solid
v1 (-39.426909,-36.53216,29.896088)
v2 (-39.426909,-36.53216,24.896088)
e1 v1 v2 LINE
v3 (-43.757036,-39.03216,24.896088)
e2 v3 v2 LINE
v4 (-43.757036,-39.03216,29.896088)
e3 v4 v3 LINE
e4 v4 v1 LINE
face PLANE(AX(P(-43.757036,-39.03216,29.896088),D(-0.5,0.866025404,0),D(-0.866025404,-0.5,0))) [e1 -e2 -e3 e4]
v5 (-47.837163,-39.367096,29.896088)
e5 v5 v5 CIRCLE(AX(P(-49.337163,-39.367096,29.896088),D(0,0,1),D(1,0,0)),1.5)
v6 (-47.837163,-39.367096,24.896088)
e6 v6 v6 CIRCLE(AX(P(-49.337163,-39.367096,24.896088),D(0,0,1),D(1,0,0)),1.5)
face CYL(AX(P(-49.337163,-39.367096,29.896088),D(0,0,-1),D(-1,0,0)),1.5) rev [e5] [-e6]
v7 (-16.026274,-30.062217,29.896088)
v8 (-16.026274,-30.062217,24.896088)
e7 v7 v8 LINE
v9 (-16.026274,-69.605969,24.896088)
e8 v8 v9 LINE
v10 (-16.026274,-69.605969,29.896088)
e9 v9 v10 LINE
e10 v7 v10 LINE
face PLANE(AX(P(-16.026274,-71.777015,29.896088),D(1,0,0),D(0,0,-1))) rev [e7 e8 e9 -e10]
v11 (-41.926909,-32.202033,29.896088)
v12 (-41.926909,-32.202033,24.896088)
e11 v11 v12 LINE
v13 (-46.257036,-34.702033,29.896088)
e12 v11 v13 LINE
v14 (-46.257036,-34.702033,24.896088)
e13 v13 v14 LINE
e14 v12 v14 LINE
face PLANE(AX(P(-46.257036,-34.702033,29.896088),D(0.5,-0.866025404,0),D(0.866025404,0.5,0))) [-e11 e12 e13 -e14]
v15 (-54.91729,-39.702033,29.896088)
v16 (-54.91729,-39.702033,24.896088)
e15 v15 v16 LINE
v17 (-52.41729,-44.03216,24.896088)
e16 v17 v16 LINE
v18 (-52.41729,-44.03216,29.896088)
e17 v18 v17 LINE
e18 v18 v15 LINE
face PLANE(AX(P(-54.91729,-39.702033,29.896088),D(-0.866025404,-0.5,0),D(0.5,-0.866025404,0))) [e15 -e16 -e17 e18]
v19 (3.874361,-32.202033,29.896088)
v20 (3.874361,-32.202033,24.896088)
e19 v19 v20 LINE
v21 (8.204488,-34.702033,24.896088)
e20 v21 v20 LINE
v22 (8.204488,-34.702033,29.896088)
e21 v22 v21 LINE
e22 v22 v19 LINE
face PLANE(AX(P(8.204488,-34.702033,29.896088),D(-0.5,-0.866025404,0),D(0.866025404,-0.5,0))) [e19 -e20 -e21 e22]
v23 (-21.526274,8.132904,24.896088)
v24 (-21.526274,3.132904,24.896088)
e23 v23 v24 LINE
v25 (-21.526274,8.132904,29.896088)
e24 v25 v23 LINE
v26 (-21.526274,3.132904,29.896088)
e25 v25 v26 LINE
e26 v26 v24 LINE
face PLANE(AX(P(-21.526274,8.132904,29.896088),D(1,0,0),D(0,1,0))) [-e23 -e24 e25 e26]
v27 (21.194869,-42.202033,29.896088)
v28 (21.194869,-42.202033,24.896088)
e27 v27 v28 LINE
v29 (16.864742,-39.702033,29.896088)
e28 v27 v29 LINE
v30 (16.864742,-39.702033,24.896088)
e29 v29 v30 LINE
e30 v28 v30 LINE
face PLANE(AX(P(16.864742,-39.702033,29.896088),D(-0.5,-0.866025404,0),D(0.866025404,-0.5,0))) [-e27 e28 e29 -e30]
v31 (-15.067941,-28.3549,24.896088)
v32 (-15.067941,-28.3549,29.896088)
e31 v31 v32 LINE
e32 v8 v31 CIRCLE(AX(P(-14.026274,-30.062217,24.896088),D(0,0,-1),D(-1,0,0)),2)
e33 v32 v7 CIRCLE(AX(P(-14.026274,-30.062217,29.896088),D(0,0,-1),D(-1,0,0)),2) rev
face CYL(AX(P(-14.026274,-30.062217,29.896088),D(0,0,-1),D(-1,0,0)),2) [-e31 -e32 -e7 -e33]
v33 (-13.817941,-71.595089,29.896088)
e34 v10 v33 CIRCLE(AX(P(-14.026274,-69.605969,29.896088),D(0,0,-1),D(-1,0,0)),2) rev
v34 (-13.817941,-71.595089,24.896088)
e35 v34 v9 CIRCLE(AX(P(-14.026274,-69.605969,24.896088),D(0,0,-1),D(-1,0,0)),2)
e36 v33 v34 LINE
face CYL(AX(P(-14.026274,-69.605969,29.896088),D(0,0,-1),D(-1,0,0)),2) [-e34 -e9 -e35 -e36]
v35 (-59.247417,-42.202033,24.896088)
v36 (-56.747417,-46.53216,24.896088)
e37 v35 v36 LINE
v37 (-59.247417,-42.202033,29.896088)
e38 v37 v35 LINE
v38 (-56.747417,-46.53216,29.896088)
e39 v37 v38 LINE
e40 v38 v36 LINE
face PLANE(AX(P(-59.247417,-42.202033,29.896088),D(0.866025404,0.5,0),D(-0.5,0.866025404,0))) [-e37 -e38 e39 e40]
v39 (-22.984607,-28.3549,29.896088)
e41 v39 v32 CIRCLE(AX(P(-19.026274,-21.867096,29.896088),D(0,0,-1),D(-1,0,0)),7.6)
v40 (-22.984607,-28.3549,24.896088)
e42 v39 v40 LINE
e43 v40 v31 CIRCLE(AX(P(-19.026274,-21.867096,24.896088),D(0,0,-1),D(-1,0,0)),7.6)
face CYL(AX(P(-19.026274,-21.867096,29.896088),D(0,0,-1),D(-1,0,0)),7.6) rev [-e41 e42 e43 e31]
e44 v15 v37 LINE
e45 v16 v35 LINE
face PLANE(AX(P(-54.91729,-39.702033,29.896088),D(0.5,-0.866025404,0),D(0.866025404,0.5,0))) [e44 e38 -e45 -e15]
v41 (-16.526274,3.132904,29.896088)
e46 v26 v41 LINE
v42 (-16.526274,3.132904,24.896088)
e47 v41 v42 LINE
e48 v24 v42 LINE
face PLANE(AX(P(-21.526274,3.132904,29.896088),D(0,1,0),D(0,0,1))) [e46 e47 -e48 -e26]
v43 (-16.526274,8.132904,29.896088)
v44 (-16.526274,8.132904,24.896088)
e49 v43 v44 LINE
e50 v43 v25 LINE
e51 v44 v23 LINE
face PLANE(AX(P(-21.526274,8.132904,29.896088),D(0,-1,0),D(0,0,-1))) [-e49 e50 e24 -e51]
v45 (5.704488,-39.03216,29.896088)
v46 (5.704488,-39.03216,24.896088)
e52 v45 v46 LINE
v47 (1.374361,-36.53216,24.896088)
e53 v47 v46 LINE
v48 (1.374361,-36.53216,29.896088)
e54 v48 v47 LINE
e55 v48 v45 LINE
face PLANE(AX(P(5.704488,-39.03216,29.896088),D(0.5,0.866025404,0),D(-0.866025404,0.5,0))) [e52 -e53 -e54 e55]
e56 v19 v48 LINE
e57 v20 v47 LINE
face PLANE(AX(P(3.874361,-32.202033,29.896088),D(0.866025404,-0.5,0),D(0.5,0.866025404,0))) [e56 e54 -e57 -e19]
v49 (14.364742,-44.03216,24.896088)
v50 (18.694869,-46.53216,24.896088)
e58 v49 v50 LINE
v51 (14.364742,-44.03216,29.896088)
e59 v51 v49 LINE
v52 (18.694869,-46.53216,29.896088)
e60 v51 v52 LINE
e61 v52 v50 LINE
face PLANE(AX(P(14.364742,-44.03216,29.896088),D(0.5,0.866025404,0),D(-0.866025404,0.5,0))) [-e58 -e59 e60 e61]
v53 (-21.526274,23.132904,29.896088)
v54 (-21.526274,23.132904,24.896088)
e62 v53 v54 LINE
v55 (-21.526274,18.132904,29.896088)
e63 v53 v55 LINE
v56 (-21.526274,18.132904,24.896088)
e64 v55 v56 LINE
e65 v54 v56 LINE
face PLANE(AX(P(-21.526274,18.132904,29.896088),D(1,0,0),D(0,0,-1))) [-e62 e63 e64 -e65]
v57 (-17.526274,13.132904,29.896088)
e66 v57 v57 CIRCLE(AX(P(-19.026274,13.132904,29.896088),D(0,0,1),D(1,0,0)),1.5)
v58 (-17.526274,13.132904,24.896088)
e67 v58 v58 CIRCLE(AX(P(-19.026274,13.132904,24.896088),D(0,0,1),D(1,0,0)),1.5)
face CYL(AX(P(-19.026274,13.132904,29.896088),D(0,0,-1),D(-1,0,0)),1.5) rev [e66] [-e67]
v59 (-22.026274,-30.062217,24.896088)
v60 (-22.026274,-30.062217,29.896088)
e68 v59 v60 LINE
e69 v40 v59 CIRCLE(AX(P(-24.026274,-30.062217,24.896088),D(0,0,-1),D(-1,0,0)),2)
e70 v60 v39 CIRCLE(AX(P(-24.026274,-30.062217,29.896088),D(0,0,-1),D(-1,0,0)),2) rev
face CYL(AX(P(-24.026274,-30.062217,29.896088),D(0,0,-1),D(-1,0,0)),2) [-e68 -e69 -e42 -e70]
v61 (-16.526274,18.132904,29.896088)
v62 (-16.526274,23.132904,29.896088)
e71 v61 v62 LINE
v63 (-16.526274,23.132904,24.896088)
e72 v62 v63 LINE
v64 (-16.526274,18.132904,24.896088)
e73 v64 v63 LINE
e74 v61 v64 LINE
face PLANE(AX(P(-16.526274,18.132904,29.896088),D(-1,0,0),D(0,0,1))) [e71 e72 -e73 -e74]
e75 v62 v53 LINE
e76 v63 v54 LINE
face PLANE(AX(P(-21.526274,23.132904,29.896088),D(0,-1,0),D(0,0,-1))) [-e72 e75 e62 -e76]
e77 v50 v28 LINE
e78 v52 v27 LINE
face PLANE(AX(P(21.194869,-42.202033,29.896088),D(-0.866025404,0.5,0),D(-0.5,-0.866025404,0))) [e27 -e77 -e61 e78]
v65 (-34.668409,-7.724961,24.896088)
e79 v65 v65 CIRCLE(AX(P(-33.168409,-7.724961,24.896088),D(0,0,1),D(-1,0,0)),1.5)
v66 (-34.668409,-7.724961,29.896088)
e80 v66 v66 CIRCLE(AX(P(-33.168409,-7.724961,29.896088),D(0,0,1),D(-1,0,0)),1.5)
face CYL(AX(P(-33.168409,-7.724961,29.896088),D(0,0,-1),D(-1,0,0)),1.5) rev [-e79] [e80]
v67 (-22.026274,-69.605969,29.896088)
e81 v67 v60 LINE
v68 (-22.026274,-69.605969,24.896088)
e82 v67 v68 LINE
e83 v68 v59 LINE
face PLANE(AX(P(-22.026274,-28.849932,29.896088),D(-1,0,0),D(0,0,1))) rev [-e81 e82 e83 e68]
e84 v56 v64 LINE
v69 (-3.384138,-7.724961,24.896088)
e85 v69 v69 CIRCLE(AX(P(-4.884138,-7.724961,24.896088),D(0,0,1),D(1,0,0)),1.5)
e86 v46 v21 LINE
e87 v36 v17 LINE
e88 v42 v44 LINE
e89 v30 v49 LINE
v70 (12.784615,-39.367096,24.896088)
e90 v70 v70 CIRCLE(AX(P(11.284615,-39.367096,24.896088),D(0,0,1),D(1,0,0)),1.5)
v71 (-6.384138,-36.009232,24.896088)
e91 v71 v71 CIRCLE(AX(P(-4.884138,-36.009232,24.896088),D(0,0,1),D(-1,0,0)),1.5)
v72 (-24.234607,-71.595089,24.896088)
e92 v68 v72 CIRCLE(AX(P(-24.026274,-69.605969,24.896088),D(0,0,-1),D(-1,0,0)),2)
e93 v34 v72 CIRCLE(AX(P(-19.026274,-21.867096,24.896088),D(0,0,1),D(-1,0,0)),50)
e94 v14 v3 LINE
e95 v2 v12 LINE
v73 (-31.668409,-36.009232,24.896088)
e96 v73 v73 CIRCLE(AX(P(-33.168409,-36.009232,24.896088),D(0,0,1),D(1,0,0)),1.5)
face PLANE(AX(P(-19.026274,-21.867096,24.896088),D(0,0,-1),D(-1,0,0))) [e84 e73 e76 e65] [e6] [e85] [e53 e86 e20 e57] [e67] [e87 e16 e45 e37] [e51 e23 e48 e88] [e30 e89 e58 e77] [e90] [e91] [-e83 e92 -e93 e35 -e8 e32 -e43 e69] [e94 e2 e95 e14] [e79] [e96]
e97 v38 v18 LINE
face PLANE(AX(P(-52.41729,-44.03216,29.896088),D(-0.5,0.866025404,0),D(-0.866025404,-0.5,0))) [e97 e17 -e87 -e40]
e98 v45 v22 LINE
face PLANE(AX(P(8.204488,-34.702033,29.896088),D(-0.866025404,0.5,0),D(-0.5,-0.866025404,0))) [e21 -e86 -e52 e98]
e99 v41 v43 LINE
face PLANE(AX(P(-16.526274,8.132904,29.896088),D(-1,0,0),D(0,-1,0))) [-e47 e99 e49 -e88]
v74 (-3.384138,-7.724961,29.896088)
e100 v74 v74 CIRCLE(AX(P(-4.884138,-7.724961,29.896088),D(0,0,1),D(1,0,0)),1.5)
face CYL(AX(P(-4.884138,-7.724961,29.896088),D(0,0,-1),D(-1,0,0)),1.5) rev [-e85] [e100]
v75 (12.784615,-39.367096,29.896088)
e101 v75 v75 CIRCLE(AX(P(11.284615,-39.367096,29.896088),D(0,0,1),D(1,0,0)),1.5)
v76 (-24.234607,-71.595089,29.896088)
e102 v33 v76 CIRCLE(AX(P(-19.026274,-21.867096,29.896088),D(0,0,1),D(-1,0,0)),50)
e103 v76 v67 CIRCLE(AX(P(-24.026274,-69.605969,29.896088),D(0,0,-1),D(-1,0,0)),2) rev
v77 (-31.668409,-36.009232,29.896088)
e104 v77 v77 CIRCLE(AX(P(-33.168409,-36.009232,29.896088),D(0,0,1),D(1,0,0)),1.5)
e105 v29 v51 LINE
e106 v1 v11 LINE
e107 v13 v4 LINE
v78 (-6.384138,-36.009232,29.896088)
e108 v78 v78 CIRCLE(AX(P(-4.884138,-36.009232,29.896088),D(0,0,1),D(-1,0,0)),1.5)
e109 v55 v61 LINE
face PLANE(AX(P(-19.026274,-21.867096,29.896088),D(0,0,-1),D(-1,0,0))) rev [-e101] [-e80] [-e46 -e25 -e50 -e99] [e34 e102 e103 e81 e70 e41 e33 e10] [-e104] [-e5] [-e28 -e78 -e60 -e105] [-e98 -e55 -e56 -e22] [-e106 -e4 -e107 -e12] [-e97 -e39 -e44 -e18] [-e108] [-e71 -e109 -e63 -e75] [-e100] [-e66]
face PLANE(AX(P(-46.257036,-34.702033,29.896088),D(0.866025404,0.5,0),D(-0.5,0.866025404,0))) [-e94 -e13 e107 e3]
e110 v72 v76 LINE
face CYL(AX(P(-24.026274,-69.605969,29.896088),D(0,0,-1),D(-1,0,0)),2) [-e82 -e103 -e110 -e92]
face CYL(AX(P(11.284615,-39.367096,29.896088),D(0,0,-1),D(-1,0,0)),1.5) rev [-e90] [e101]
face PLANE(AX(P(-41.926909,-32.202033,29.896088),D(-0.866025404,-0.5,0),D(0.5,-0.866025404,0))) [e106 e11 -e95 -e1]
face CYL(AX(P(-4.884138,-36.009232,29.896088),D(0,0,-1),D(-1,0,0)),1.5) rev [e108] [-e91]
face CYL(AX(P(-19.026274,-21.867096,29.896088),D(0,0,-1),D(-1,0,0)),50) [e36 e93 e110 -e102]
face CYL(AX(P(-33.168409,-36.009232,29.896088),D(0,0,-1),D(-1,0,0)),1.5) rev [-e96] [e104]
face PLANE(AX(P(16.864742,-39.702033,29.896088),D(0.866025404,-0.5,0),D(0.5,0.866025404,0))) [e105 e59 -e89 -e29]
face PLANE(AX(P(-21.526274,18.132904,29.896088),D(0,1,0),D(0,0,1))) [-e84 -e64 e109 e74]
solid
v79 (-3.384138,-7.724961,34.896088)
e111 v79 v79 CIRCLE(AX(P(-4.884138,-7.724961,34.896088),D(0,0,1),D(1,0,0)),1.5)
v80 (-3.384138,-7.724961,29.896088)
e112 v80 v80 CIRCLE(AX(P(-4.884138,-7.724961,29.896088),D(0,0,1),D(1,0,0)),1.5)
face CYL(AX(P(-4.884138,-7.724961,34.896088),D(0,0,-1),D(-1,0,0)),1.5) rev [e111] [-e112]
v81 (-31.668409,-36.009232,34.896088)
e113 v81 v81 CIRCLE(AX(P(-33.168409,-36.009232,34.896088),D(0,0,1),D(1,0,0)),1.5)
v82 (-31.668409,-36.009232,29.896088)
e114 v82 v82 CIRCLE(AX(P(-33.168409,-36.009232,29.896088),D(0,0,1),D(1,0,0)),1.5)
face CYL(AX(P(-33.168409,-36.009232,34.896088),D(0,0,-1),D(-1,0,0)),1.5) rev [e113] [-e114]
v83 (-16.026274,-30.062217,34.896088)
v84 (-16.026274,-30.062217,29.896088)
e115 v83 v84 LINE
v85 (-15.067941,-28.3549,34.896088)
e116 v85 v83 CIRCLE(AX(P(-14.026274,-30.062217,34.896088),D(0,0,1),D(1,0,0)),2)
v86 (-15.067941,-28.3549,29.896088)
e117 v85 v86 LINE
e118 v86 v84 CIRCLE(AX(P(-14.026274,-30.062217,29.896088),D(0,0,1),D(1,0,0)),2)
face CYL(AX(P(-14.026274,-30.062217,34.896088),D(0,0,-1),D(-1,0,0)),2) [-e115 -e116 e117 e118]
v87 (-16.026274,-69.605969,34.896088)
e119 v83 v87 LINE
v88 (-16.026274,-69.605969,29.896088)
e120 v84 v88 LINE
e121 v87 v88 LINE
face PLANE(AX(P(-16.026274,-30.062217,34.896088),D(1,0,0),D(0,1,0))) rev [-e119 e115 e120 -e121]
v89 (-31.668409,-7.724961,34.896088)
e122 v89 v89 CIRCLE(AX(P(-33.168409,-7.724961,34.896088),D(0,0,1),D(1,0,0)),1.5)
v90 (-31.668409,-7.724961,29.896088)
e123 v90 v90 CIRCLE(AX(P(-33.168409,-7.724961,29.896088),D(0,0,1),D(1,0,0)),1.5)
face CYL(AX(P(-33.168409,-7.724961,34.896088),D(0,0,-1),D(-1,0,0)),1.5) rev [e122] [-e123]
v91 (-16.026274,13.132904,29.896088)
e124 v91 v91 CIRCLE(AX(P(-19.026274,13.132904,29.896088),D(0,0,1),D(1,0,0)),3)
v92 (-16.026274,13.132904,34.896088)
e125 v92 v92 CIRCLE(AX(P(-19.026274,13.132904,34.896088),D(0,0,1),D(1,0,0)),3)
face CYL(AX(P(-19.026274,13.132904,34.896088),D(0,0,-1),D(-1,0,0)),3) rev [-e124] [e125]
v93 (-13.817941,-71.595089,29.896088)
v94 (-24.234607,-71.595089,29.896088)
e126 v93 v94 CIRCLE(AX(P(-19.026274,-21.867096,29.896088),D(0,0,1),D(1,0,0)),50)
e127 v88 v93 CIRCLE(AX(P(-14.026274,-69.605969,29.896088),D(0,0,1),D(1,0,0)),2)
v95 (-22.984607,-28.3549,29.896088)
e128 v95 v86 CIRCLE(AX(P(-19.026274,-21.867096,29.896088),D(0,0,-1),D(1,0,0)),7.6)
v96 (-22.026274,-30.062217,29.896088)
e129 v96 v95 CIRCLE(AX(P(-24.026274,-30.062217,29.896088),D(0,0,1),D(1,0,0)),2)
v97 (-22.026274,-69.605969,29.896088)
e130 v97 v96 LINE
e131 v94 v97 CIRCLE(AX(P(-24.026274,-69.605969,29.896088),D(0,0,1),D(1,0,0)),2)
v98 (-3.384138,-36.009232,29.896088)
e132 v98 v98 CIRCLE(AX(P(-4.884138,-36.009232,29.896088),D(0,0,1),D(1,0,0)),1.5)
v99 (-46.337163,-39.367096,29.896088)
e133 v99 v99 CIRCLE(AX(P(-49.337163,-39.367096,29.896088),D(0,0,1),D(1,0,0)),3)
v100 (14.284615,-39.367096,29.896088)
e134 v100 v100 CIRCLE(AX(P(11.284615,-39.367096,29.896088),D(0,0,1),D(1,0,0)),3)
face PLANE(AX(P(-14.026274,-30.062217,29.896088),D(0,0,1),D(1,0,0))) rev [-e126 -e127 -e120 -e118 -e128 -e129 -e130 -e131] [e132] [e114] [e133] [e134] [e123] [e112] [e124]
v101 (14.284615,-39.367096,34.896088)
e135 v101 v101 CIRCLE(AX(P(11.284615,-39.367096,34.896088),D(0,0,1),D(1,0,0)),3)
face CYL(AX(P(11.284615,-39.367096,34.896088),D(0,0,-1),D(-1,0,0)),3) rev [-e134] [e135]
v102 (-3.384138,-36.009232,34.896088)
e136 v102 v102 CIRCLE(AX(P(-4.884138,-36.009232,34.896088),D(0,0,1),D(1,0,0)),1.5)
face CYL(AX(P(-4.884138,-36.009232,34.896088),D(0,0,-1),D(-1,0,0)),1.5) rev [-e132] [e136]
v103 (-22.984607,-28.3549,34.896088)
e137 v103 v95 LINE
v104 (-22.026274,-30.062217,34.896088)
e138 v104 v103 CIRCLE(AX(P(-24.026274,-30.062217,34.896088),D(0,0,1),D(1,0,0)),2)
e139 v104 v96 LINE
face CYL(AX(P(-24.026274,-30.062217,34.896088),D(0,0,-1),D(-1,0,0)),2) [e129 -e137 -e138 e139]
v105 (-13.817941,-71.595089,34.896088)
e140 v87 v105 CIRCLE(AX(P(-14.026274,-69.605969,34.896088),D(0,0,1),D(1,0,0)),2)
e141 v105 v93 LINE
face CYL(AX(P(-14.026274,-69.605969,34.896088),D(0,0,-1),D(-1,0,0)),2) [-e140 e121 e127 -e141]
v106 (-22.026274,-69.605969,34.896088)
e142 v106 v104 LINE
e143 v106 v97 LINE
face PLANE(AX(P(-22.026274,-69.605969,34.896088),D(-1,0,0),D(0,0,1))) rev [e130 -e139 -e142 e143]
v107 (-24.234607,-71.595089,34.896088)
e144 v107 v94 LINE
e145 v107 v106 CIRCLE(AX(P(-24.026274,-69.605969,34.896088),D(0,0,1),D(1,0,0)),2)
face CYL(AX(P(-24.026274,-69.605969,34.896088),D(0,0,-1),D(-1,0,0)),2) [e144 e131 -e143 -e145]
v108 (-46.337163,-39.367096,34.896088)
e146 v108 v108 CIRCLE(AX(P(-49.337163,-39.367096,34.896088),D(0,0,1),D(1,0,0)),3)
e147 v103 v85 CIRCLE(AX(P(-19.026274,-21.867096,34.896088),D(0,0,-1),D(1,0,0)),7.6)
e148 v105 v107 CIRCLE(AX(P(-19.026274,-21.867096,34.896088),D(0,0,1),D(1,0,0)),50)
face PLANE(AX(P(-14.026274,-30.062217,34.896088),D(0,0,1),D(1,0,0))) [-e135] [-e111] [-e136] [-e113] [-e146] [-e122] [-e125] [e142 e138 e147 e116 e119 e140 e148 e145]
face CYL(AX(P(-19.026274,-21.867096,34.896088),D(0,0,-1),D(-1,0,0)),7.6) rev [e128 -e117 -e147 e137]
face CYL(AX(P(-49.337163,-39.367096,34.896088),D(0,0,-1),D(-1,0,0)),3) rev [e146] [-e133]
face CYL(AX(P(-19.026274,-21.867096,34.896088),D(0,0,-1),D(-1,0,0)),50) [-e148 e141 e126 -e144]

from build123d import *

# Parameters (mm, degrees)
BODY_MOVE_COPY2_START     = 24.896087842
BODY_MOVE_COPY2_OUTLINE_R = 1.5
BODY_MOVE_COPY2_OUTLINE_W = 5
BODY_MOVE_COPY2_OUTLINE_H = 5
BODY_MOVE_COPY2_DEPTH     = 5
SKETCH2_R                 = 3
SKETCH2_R_2               = 1.5
BOSS_EXTRUDE1_DEPTH       = 5


# Read off the part's stored shape, not the designer's step: Body-Move/Copy2
with BuildPart() as part:
    # Body-Move/Copy2 outline → Body-Move/Copy2 (new body)
    with BuildSketch(Plane.XY.offset(BODY_MOVE_COPY2_START)):
        with BuildLine():
            ThreePointArc((-22.026273853, -30.062216719), (-22.282236391, -29.083271708), (-22.984607186, -28.354899948))
            ThreePointArc((-22.984607186, -28.354899948), (-19.026273852, -14.267096219), (-15.067940519, -28.354899948))
            ThreePointArc((-15.067940519, -28.354899948), (-15.770311314, -29.083271708), (-16.026273853, -30.062216719))
            Line((-16.026273853, -30.062216719), (-16.026273853, -69.605969269))
            ThreePointArc((-16.026273853, -69.605969269), (-15.364805386, -71.092015477), (-13.817940519, -71.595088979))
            ThreePointArc((-13.817940519, -71.595088979), (-19.026273853, 28.132903781), (-24.234607186, -71.595088979))
            ThreePointArc((-24.234607186, -71.595088979), (-22.687742319, -71.092015477), (-22.026273853, -69.605969269))
            Line((-22.026273853, -69.605969269), (-22.026273853, -30.062216719))
        make_face()
        Polygon((-59.247417023, -42.20203271), (-54.917290004, -39.70203271), (-52.417290004, -44.032159729), (-56.747417023, -46.532159729), align=None, mode=Mode.SUBTRACT)
        with Locations((-49.337162985, -39.367096219)):
            Circle(BODY_MOVE_COPY2_OUTLINE_R, mode=Mode.SUBTRACT)
        Polygon((-39.426908947, -36.532159729), (-43.757035966, -39.032159729), (-46.257035966, -34.70203271), (-41.926908947, -32.20203271), align=None, mode=Mode.SUBTRACT)
        with Locations((-33.168409476, -36.009231843)):
            Circle(BODY_MOVE_COPY2_OUTLINE_R, mode=Mode.SUBTRACT)
        with Locations((-4.884138229, -36.009231843)):
            Circle(BODY_MOVE_COPY2_OUTLINE_R, mode=Mode.SUBTRACT)
        Polygon((3.874361242, -32.20203271), (8.204488261, -34.70203271), (5.704488261, -39.032159729), (1.374361242, -36.532159729), align=None, mode=Mode.SUBTRACT)
        Polygon((18.694869318, -46.532159729), (14.364742299, -44.032159729), (16.864742299, -39.70203271), (21.194869318, -42.20203271), align=None, mode=Mode.SUBTRACT)
        with Locations((11.28461528, -39.367096219)):
            Circle(BODY_MOVE_COPY2_OUTLINE_R, mode=Mode.SUBTRACT)
        with Locations((-33.168409476, -7.724960596)):
            Circle(BODY_MOVE_COPY2_OUTLINE_R, mode=Mode.SUBTRACT)
        with Locations((-19.026273853, 5.632903781)):
            Rectangle(BODY_MOVE_COPY2_OUTLINE_W, BODY_MOVE_COPY2_OUTLINE_H, mode=Mode.SUBTRACT)
        with Locations((-19.026273853, 13.132903781)):
            Circle(BODY_MOVE_COPY2_OUTLINE_R, mode=Mode.SUBTRACT)
        with Locations((-19.026273853, 20.632903781)):
            Rectangle(BODY_MOVE_COPY2_OUTLINE_W, BODY_MOVE_COPY2_OUTLINE_H, mode=Mode.SUBTRACT)
        with Locations((-4.884138229, -7.724960596)):
            Circle(BODY_MOVE_COPY2_OUTLINE_R, mode=Mode.SUBTRACT)
    extrude(amount=BODY_MOVE_COPY2_DEPTH)


with BuildPart() as body_2:
    # Sketch2 → Boss-Extrude1 (new body)
    with BuildSketch(Plane.XY.offset(29.896087842)):
        with BuildLine():
            Line((-16.026273853, -30.062216719), (-16.026273853, -69.605969269))
            ThreePointArc((-16.026273853, -69.605969269), (-15.364805386, -71.092015477), (-13.817940519, -71.595088979))
            ThreePointArc((-13.817940519, -71.595088979), (-19.026273853, 28.132903781), (-24.234607186, -71.595088979))
            ThreePointArc((-24.234607186, -71.595088979), (-22.687742319, -71.092015477), (-22.026273853, -69.605969269))
            Line((-22.026273853, -69.605969269), (-22.026273853, -30.062216719))
            ThreePointArc((-22.026273853, -30.062216719), (-22.282236391, -29.083271708), (-22.984607186, -28.354899948))
            ThreePointArc((-22.984607186, -28.354899948), (-19.026273853, -14.267096219), (-15.067940519, -28.354899948))
            ThreePointArc((-15.067940519, -28.354899948), (-15.770311314, -29.083271708), (-16.026273853, -30.062216719))
        make_face()
        with Locations((-19.026273853, 13.132903781)):
            Circle(SKETCH2_R, mode=Mode.SUBTRACT)
        with Locations((11.28461528, -39.367096219)):
            Circle(SKETCH2_R, mode=Mode.SUBTRACT)
        with Locations((-49.337162985, -39.367096219)):
            Circle(SKETCH2_R, mode=Mode.SUBTRACT)
        with Locations((-33.168409476, -7.724960596)):
            Circle(SKETCH2_R_2, mode=Mode.SUBTRACT)
        with Locations((-4.884138229, -7.724960596)):
            Circle(SKETCH2_R_2, mode=Mode.SUBTRACT)
        with Locations((-4.884138229, -36.009231843)):
            Circle(SKETCH2_R_2, mode=Mode.SUBTRACT)
        with Locations((-33.168409476, -36.009231843)):
            Circle(SKETCH2_R_2, mode=Mode.SUBTRACT)
    extrude(amount=BOSS_EXTRUDE1_DEPTH)


solid = Compound([part.part, body_2.part])
